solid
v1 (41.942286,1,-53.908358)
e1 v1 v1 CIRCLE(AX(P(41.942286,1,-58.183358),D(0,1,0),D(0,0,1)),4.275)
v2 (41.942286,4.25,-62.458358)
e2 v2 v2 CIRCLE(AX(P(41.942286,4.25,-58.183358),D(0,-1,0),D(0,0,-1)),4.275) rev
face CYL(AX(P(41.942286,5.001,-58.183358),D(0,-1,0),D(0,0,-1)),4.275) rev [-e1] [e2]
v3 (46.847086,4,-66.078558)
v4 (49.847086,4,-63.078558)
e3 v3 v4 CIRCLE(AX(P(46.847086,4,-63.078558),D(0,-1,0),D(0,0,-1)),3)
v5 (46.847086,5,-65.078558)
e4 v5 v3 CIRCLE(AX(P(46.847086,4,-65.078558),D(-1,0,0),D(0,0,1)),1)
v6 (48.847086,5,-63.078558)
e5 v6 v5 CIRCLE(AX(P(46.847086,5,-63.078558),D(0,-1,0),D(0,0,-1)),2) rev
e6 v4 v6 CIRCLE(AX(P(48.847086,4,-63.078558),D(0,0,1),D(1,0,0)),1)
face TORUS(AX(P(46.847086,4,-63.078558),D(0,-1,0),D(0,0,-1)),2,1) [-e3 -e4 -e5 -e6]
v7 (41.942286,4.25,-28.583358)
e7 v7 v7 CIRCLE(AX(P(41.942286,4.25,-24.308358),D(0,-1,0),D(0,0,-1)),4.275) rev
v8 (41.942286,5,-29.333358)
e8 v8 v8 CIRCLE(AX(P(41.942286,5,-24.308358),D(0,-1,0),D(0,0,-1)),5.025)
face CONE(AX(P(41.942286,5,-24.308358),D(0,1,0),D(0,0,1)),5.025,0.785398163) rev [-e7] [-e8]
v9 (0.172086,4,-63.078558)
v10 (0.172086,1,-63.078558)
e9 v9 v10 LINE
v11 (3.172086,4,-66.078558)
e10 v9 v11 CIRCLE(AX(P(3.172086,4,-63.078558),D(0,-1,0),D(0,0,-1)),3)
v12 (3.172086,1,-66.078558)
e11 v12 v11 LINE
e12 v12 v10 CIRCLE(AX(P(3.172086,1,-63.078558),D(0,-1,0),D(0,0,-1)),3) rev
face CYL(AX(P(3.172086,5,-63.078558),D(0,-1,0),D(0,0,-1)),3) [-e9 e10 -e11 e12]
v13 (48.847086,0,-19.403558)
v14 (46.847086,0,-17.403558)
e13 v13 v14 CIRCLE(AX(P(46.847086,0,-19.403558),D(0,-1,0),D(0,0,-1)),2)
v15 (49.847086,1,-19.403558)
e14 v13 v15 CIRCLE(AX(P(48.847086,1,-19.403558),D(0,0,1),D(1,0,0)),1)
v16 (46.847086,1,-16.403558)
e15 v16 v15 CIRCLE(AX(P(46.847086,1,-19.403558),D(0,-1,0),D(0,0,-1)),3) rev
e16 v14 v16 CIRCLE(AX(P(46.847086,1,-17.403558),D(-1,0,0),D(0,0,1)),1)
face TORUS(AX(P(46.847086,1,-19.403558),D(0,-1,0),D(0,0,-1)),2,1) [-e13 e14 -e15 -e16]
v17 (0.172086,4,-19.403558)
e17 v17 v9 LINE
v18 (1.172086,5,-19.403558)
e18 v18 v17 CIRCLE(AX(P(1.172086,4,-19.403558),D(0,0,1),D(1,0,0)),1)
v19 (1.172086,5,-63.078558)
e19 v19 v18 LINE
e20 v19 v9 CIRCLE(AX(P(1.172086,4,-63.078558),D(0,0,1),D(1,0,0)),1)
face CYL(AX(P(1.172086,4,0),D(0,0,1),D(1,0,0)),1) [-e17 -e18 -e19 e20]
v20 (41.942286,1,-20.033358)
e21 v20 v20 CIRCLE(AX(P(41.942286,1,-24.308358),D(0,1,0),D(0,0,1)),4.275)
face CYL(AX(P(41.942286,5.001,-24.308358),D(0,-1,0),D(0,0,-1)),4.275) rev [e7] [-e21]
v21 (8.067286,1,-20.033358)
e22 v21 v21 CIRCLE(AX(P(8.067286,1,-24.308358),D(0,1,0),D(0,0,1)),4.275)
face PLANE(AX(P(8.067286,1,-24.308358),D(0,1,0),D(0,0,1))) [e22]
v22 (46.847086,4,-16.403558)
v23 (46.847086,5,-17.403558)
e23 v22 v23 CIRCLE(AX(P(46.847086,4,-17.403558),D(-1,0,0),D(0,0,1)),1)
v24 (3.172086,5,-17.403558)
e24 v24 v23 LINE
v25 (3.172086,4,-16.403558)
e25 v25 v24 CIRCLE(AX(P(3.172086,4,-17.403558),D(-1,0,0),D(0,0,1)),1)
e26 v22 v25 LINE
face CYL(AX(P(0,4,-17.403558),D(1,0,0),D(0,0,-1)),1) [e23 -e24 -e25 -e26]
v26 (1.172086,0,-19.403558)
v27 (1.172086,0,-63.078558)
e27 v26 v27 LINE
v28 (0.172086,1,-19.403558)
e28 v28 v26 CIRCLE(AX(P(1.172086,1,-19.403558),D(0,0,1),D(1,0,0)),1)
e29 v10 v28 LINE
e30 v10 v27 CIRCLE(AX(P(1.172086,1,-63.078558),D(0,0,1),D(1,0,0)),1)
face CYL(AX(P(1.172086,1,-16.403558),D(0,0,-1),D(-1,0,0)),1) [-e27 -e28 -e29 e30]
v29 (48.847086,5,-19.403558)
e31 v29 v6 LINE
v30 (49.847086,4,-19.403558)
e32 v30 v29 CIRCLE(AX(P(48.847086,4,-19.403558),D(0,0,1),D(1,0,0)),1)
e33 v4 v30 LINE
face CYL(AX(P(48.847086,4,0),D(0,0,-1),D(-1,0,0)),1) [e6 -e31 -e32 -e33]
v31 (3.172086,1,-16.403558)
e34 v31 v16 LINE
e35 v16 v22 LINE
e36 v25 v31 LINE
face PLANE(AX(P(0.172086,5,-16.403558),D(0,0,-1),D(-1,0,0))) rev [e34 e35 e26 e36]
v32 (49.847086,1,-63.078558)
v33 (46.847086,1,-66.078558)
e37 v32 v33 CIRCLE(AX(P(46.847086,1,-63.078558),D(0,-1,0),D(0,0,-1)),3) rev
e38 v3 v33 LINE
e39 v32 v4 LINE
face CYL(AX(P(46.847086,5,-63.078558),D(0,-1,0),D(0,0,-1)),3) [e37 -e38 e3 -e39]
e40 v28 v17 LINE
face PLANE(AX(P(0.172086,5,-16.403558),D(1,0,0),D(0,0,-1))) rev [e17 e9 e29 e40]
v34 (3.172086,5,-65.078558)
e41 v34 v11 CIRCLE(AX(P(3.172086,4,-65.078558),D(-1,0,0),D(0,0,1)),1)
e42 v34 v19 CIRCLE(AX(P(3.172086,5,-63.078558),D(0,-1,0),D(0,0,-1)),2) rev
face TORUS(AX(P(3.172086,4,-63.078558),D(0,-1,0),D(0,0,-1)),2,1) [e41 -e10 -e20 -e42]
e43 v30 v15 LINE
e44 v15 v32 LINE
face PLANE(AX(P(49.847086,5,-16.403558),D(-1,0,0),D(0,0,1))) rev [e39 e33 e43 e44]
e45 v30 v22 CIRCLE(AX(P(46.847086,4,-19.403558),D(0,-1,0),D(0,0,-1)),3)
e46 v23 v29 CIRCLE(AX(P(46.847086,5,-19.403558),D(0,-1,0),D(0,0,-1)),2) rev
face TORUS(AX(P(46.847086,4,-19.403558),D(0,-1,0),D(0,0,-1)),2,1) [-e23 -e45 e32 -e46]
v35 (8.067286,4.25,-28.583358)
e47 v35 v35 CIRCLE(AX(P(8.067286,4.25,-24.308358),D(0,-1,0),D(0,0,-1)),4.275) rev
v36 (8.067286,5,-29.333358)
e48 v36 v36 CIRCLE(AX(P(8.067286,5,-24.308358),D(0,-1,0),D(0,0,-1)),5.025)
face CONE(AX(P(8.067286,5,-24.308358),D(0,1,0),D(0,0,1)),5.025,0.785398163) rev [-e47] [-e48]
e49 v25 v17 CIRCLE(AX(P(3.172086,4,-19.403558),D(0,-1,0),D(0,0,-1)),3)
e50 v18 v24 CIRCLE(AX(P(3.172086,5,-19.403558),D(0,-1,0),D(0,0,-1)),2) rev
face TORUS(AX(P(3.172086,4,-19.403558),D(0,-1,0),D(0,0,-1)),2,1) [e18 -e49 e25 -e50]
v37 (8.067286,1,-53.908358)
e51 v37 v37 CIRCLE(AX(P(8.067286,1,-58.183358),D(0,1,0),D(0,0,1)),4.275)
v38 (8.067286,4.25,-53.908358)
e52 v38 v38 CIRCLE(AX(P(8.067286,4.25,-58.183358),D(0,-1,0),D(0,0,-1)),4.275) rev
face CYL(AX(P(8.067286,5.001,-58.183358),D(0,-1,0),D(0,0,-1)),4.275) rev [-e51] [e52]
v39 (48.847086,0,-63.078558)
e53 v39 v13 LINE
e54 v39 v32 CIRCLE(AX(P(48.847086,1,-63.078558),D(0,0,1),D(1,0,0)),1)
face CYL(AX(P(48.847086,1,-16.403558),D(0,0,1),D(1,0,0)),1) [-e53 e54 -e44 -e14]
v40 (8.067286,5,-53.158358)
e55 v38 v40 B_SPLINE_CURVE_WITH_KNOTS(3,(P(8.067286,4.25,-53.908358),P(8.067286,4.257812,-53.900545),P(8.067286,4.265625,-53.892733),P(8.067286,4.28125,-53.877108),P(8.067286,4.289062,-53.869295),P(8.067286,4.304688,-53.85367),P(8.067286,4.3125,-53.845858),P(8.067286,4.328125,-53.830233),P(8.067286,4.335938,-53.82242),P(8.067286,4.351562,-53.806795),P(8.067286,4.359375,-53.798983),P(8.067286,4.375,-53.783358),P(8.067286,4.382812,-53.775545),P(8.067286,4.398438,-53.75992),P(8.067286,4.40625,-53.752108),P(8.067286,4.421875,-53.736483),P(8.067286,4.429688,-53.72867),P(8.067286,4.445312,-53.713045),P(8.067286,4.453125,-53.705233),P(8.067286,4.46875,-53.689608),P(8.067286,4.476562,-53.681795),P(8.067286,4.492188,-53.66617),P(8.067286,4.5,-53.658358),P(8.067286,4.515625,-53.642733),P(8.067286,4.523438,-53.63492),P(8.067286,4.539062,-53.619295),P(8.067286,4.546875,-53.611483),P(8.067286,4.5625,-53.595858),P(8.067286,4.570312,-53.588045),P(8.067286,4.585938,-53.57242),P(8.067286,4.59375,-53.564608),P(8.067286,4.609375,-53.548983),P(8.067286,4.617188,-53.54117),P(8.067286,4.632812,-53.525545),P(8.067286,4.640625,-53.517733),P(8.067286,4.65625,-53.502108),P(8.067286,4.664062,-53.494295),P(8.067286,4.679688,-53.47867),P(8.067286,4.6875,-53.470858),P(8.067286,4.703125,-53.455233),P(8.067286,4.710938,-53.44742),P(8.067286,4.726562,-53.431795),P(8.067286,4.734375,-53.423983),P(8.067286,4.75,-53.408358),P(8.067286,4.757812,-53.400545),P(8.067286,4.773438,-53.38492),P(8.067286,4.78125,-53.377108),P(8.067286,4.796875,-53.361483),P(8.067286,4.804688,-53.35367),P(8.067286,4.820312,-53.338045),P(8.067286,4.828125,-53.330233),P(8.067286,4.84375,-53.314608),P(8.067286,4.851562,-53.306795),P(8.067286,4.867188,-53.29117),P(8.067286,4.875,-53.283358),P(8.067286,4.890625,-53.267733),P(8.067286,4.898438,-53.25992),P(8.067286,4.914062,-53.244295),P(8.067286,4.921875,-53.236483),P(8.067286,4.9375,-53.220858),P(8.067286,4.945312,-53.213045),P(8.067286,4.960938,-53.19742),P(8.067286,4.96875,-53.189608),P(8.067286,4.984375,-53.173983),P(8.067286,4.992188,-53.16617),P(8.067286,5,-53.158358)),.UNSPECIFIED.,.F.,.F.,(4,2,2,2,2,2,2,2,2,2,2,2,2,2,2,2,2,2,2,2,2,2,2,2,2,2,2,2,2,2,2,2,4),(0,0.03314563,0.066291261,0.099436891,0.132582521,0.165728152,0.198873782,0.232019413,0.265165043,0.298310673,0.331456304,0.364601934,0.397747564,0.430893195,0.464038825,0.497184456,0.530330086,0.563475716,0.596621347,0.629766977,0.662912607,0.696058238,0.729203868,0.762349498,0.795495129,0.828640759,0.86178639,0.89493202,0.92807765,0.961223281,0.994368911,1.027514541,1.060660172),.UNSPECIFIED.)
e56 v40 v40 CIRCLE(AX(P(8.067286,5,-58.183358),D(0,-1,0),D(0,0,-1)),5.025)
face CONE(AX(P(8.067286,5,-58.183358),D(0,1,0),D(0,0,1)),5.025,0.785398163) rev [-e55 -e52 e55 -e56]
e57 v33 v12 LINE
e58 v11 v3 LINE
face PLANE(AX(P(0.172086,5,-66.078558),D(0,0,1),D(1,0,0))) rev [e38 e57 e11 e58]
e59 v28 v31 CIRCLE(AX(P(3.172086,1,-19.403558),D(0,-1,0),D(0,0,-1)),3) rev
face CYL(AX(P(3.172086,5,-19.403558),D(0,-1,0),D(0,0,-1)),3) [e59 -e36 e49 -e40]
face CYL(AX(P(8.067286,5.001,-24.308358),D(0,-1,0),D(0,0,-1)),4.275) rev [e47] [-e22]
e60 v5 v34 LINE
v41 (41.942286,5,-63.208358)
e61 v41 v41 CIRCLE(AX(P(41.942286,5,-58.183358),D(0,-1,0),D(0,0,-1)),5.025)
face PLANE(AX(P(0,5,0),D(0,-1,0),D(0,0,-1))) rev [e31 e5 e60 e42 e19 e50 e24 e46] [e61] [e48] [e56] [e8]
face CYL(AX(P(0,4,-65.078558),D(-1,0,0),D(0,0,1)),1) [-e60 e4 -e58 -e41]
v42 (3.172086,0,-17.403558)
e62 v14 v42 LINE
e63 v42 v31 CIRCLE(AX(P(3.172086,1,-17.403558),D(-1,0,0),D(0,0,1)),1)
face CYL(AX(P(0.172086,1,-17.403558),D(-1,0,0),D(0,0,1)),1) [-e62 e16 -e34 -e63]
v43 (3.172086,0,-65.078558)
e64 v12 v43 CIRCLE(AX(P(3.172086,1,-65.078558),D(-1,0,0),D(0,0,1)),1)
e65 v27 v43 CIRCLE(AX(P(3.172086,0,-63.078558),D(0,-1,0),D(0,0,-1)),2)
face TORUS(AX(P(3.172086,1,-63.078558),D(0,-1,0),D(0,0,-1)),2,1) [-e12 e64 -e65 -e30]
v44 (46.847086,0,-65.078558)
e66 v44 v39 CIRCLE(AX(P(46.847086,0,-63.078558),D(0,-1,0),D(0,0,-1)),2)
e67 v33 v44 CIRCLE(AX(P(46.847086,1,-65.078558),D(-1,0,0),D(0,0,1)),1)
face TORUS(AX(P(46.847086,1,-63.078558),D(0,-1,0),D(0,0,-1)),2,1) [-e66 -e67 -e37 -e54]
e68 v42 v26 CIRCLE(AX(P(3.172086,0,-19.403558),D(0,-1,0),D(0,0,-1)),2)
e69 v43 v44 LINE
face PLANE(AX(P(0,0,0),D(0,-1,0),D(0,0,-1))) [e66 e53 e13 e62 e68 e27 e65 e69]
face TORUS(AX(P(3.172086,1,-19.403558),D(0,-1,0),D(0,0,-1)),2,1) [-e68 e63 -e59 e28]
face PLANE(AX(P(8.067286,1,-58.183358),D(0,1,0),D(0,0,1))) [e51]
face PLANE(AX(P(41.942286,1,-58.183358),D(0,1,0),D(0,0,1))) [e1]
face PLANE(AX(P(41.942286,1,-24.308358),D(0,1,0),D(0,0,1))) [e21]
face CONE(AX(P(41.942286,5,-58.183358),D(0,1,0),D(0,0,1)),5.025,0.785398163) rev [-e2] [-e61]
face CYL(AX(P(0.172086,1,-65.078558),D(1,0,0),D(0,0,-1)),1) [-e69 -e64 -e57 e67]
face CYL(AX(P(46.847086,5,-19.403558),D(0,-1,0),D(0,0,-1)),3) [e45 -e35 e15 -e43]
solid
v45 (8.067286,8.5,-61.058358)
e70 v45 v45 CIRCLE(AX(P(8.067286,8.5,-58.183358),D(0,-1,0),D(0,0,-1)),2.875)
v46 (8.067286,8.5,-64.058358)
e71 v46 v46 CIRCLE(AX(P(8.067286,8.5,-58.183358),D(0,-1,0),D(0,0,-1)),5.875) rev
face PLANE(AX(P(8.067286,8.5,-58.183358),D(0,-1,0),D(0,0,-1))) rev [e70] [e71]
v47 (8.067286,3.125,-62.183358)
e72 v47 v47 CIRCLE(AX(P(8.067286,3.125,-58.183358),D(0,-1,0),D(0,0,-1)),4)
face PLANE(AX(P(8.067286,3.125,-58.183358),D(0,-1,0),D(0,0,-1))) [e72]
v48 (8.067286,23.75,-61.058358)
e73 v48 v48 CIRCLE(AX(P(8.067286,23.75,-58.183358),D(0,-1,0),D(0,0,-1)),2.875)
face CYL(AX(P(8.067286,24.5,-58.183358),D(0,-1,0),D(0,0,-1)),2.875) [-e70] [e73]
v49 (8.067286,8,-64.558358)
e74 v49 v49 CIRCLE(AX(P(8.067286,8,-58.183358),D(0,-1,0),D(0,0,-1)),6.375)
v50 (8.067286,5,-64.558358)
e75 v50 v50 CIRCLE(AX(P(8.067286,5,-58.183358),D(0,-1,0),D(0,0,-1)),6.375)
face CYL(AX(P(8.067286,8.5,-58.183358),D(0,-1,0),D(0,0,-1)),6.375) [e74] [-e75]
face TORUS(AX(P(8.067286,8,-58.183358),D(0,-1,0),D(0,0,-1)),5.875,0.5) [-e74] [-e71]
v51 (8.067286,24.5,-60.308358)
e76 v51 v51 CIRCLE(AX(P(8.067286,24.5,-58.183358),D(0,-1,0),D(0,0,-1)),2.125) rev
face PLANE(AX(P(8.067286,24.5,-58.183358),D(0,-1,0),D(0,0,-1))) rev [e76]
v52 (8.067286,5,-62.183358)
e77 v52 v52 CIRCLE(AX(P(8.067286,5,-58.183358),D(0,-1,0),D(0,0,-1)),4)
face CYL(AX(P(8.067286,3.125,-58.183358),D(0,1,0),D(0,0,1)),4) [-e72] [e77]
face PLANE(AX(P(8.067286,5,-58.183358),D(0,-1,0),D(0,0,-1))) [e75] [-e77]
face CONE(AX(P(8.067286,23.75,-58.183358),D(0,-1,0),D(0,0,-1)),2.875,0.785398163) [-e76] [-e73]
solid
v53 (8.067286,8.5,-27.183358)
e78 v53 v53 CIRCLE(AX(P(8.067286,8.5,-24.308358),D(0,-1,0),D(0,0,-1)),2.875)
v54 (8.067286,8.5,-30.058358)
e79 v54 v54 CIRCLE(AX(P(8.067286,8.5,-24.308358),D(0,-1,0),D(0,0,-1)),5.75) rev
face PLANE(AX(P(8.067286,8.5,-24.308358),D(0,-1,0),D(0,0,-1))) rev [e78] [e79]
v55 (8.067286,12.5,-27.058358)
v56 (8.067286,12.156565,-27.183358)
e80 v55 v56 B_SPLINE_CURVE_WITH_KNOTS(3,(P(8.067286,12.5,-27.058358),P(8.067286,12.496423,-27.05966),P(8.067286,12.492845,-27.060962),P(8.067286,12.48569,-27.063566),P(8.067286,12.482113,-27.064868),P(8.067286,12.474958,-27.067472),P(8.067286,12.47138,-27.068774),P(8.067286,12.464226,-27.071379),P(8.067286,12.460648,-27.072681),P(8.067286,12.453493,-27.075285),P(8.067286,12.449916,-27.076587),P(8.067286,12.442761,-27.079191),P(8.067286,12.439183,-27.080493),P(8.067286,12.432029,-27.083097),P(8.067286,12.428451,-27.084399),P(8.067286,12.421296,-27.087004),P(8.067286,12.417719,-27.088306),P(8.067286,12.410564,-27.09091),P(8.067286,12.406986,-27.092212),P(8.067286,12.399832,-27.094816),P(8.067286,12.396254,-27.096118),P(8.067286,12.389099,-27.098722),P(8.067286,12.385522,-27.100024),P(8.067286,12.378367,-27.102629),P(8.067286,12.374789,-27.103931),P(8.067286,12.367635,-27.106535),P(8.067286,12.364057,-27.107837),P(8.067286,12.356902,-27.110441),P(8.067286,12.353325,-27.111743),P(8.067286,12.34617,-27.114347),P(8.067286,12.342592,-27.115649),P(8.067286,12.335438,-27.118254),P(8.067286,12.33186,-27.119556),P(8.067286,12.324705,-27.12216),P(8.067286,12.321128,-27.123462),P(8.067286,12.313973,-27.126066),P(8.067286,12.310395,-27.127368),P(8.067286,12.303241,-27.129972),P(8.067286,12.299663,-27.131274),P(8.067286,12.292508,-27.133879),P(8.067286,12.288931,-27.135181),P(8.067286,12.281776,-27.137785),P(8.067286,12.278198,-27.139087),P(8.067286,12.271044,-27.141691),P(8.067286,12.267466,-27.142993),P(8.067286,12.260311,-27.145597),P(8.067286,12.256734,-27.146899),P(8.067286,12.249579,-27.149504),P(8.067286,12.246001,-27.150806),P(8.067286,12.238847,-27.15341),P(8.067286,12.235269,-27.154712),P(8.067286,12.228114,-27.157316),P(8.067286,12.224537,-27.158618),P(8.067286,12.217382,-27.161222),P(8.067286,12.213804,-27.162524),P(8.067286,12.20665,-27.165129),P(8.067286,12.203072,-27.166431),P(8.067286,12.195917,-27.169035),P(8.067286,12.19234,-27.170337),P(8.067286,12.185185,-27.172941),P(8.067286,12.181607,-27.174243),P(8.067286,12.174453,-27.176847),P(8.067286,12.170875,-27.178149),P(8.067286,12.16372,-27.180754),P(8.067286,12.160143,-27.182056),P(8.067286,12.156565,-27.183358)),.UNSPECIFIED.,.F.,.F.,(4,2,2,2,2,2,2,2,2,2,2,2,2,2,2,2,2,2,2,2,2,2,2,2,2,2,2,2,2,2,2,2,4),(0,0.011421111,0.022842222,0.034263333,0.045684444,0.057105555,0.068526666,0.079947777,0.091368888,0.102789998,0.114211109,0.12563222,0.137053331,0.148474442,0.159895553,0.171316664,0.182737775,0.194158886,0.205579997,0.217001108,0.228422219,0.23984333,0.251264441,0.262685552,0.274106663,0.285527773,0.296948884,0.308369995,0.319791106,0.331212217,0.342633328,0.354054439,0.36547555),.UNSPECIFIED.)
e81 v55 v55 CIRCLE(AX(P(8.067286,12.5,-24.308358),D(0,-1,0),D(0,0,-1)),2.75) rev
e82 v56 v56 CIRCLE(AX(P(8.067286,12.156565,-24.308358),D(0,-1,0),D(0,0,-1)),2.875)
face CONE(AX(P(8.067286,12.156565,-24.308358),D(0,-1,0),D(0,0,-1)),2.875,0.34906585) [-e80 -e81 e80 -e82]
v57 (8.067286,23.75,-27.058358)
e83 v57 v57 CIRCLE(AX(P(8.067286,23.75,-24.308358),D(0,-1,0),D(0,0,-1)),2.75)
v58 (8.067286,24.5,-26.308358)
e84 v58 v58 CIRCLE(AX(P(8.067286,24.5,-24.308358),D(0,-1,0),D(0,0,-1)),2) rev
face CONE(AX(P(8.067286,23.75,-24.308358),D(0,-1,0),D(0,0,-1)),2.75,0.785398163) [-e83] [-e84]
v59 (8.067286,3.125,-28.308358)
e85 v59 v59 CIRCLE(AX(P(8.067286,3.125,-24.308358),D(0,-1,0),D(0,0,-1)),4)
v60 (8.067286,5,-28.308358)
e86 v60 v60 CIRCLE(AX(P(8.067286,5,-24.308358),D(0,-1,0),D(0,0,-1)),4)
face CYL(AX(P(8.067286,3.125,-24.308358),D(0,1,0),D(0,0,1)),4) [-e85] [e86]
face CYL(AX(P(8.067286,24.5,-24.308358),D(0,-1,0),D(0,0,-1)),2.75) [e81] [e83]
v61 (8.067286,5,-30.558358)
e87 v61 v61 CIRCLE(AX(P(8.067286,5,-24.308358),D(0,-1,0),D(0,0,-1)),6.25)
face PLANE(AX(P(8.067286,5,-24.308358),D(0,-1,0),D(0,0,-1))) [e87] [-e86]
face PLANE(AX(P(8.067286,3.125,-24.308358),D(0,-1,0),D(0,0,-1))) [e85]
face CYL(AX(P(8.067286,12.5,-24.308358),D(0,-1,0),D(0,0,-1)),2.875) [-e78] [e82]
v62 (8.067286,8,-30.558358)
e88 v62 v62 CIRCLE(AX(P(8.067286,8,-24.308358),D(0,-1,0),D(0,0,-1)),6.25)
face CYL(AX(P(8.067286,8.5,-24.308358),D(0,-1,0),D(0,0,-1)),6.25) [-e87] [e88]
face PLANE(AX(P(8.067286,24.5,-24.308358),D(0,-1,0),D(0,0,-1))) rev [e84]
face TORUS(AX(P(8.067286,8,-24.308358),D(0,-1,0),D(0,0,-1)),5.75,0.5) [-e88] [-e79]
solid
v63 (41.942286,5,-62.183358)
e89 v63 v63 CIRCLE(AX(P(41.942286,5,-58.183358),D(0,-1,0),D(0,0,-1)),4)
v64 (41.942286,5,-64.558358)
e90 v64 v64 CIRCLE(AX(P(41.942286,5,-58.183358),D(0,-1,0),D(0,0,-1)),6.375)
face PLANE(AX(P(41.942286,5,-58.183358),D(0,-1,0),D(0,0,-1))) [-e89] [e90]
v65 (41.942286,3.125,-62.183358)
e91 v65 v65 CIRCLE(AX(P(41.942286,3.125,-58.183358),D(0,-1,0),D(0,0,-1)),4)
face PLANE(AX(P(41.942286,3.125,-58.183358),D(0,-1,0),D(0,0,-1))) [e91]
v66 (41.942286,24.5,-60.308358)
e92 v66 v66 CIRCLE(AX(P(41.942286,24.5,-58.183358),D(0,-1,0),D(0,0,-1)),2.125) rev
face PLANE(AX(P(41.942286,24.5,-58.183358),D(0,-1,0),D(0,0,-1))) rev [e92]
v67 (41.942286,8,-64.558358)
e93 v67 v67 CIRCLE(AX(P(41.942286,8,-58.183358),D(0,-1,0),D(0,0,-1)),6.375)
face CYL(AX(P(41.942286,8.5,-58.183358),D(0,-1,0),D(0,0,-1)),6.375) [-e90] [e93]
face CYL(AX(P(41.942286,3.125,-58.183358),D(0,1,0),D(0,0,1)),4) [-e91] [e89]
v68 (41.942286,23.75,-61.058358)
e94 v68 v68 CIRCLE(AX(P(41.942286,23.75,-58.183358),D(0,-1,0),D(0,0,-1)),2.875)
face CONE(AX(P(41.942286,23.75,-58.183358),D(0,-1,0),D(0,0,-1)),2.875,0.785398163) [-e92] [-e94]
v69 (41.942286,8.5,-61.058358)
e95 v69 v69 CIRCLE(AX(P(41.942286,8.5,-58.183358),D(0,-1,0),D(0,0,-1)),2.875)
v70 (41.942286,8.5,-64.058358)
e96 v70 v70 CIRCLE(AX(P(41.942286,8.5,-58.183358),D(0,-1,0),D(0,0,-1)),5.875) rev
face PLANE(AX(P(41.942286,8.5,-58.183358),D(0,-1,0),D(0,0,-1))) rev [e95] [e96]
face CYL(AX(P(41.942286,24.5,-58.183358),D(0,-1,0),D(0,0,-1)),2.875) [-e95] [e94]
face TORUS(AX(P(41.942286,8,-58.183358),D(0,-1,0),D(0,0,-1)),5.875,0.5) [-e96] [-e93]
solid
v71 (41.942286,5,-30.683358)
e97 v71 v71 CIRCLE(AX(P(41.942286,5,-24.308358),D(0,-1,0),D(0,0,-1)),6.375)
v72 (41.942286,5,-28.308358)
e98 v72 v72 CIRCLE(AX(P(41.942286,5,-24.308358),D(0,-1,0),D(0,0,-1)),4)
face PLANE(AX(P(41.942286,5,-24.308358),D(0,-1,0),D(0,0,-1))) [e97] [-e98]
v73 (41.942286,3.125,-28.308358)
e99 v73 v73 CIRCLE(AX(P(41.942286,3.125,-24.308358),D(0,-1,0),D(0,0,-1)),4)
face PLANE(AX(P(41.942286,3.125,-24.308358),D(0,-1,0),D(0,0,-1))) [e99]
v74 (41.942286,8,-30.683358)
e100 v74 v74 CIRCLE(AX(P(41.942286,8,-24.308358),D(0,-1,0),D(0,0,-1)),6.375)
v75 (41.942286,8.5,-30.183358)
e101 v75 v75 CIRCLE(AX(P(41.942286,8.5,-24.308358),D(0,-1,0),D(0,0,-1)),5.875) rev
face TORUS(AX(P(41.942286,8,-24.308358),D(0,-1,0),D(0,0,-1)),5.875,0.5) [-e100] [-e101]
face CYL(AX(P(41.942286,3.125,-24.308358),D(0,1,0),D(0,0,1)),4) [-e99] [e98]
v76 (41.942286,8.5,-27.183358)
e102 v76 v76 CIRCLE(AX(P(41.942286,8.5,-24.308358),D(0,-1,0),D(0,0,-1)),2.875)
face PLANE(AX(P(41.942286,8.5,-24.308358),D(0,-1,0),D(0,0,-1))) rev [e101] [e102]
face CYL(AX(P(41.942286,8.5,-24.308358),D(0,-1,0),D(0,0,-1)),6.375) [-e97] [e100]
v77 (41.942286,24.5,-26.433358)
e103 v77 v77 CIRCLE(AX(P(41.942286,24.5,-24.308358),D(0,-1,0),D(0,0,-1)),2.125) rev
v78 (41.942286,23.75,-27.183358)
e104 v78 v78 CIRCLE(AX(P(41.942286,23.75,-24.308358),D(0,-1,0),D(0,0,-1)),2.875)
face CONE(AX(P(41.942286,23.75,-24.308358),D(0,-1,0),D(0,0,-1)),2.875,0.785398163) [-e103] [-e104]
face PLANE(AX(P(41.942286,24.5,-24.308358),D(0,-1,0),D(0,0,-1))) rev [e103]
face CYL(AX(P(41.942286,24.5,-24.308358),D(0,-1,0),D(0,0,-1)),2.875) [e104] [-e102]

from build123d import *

# Parameters (mm, degrees)
SKETCH1_W             = 49.675
SKETCH1_H             = 49.675
BOSS_EXTRUDE1_DEPTH   = 5
CUT_EXTRUDE1_REACH    = 85.922
CUT_EXTRUDE1_START    = 1
SKETCH3_R             = 4.275
BOSS_EXTRUDE2_START   = 5
SKETCH2_R             = 6.375
BOSS_EXTRUDE2_DEPTH   = 3.5
BOSS_EXTRUDE2_2_DEPTH = 3.5
SKETCH2_R_2           = 6.25
BOSS_EXTRUDE2_3_DEPTH = 3.5
BOSS_EXTRUDE2_4_DEPTH = 3.5
BOSS_EXTRUDE3_START   = 8.5
SKETCH2_3_R           = 2.875
SKETCH2_3_R_2         = 2.75
BOSS_EXTRUDE3_DEPTH   = 16
BOSS_EXTRUDE4_START   = 5
SKETCH3_2_R           = 4
BOSS_EXTRUDE4_DEPTH   = 1.875
BOSS_EXTRUDE5_START   = 8.5
SKETCH2_4_R           = 2.875
BOSS_EXTRUDE5_DEPTH   = 4
CHAMFER6_SIZE2        = 0.125
CHAMFER6_SIZE         = 0.343434677
CHAMFER1_SIZE         = 0.75
FILLET5_R             = 3
FILLET6_R             = 1
FILLET1_R             = 0.5
FILLET2_R             = 0.5
FILLET3_R             = 0.5
FILLET4_R             = 0.5
CHAMFER2_SIZE         = 0.75
CHAMFER3_SIZE         = 0.75
CHAMFER4_SIZE         = 0.75
CHAMFER5_SIZE         = 0.75


with BuildPart() as part:
    # Sketch1 → Boss-Extrude1 (new body)
    with BuildSketch(Plane(origin=(0, 0, 0), x_dir=(1, 0, 0), z_dir=(0, 1, 0))):
        with Locations((25.009585601, 41.241057723)):
            Rectangle(SKETCH1_W, SKETCH1_H)
    extrude(amount=BOSS_EXTRUDE1_DEPTH)

    # Sketch3 → Cut-Extrude1 (cut, up to next)
    with BuildSketch(Plane(origin=(0, 0, 0), x_dir=(1, 0, 0), z_dir=(0, 1, 0)).offset(CUT_EXTRUDE1_START), mode=Mode.PRIVATE) as cut_extrude1_sk1:
        with Locations(Location((8.067285601, 24.308357723, 0), (0, 0, 90))):
            Circle(SKETCH3_R)
    cut_extrude1_tool1 = extrude(cut_extrude1_sk1.sketch, amount=CUT_EXTRUDE1_REACH, mode=Mode.PRIVATE) & part.part
    # Sketch3 → Cut-Extrude1 (cut, up to next)
    with BuildSketch(Plane(origin=(0, 0, 0), x_dir=(1, 0, 0), z_dir=(0, 1, 0)).offset(CUT_EXTRUDE1_START), mode=Mode.PRIVATE) as cut_extrude1_sk2:
        with Locations(Location((41.942285601, 24.308357723, 0), (0, 0, 90))):
            Circle(SKETCH3_R)
    cut_extrude1_tool2 = extrude(cut_extrude1_sk2.sketch, amount=CUT_EXTRUDE1_REACH, mode=Mode.PRIVATE) & part.part
    # Sketch3 → Cut-Extrude1 (cut, up to next)
    with BuildSketch(Plane(origin=(0, 0, 0), x_dir=(1, 0, 0), z_dir=(0, 1, 0)).offset(CUT_EXTRUDE1_START), mode=Mode.PRIVATE) as cut_extrude1_sk3:
        with Locations(Location((41.942285601, 58.183357723, 0), (0, 0, 90))):
            Circle(SKETCH3_R)
    cut_extrude1_tool3 = extrude(cut_extrude1_sk3.sketch, amount=CUT_EXTRUDE1_REACH, mode=Mode.PRIVATE) & part.part
    # Sketch3 → Cut-Extrude1 (cut, up to next)
    with BuildSketch(Plane(origin=(0, 0, 0), x_dir=(1, 0, 0), z_dir=(0, 1, 0)).offset(CUT_EXTRUDE1_START), mode=Mode.PRIVATE) as cut_extrude1_sk4:
        with Locations(Location((8.067285601, 58.183357723, 0), (0, 0, 90))):
            Circle(SKETCH3_R)
    cut_extrude1_tool4 = extrude(cut_extrude1_sk4.sketch, amount=CUT_EXTRUDE1_REACH, mode=Mode.PRIVATE) & part.part
    add(cut_extrude1_tool1.solids().sort_by_distance((8.067286, 1, -24.308358))[0], mode=Mode.SUBTRACT)
    add(cut_extrude1_tool2.solids().sort_by_distance((41.942286, 1, -24.308358))[0], mode=Mode.SUBTRACT)
    add(cut_extrude1_tool3.solids().sort_by_distance((41.942286, 1, -58.183358))[0], mode=Mode.SUBTRACT)
    add(cut_extrude1_tool4.solids().sort_by_distance((8.067286, 1, -58.183358))[0], mode=Mode.SUBTRACT)

    # Chamfer1
    chamfer1_edges = [part.edges().sort_by_distance(p)[0] for p in [
        (41.942285601, 5, -53.908357723),
        (8.067285601, 5, -20.033357723),
        (8.067285601, 5, -53.908357723),
        (41.942285601, 5, -20.033357723),
    ]]
    chamfer(chamfer1_edges, length=CHAMFER1_SIZE)

    # Fillet5
    fillet5_edges = [part.edges().sort_by_distance(p)[0] for p in [
        (0.172085601, 2.5, -66.078557723),
        (49.847085601, 2.5, -66.078557723),
        (49.847085601, 2.5, -16.403557723),
        (0.172085601, 2.5, -16.403557723),
    ]]
    fillet(fillet5_edges, radius=FILLET5_R)

    # Fillet6
    fillet6_edges = [part.edges().sort_by_distance(p)[0] for p in [
        (49.847085601, 0, -41.241057723),
        (49.847085601, 5, -41.241057723),
        (0.172085601, 0, -41.241057723),
        (25.009585601, 0, -66.078557723),
        (25.009585601, 0, -16.403557723),
        (1.050765257, 0, -17.282237379),
        (1.050765257, 0, -65.199878066),
        (48.968405944, 0, -65.199878066),
        (48.968405944, 0, -17.282237379),
        (25.009585601, 5, -16.403557723),
        (0.172085601, 5, -41.241057723),
        (25.009585601, 5, -66.078557723),
        (1.050765257, 5, -17.282237379),
        (1.050765257, 5, -65.199878066),
        (48.968405944, 5, -65.199878066),
        (48.968405944, 5, -17.282237379),
    ]]
    fillet(fillet6_edges, radius=FILLET6_R)


with BuildPart() as body_2:
    # Sketch2 → Boss-Extrude2 (new body)
    with BuildSketch(Plane(origin=(0, 0, 0), x_dir=(1, 0, 0), z_dir=(0, 1, 0)).offset(BOSS_EXTRUDE2_START)):
        with Locations(Location((41.942285601, 58.183357723, 0), (0, 0, 90))):
            Circle(SKETCH2_R)
    extrude(amount=BOSS_EXTRUDE2_DEPTH)



with BuildPart() as body_3:
    # Sketch2 → Boss-Extrude2 2 (new body)
    with BuildSketch(Plane(origin=(0, 0, 0), x_dir=(1, 0, 0), z_dir=(0, 1, 0)).offset(BOSS_EXTRUDE2_START)):
        with Locations(Location((41.942285601, 24.308357723, 0), (0, 0, 90))):
            Circle(SKETCH2_R)
    extrude(amount=BOSS_EXTRUDE2_2_DEPTH)


with BuildPart() as body_4:
    # Sketch2 → Boss-Extrude2 3 (new body)
    with BuildSketch(Plane(origin=(0, 0, 0), x_dir=(1, 0, 0), z_dir=(0, 1, 0)).offset(BOSS_EXTRUDE2_START)):
        with Locations(Location((8.067285601, 24.308357723, 0), (0, 0, 90))):
            Circle(SKETCH2_R_2)
    extrude(amount=BOSS_EXTRUDE2_3_DEPTH)


with BuildPart() as body_5:
    # Sketch2 → Boss-Extrude2 4 (new body)
    with BuildSketch(Plane(origin=(0, 0, 0), x_dir=(1, 0, 0), z_dir=(0, 1, 0)).offset(BOSS_EXTRUDE2_START)):
        with Locations(Location((8.067285601, 58.183357723, 0), (0, 0, 90))):
            Circle(SKETCH2_R)
    extrude(amount=BOSS_EXTRUDE2_4_DEPTH)


with BuildPart() as body_2_1:
    add(body_2.part)

    add(body_3.part)  # Boss-Extrude3 merges body 3

    add(body_4.part)  # Boss-Extrude3 merges body 4

    add(body_5.part)  # Boss-Extrude3 merges body 5
    # Sketch2<3> → Boss-Extrude3 (add)
    with BuildSketch(Plane(origin=(0, 0, 0), x_dir=(1, 0, 0), z_dir=(0, 1, 0)).offset(BOSS_EXTRUDE3_START)):
        with Locations(Location((8.067285601, 58.183357723, 0), (0, 0, 90))):
            Circle(SKETCH2_3_R)
        with Locations(Location((41.942285601, 58.183357723, 0), (0, 0, 90))):
            Circle(SKETCH2_3_R)
        with Locations(Location((41.942285601, 24.308357723, 0), (0, 0, 90))):
            Circle(SKETCH2_3_R)
        with Locations(Location((8.067285601, 24.308357723, 0), (0, 0, 90))):
            Circle(SKETCH2_3_R_2)
    extrude(amount=BOSS_EXTRUDE3_DEPTH)

    # Sketch3<2> → Boss-Extrude4 (add)
    with BuildSketch(Plane(origin=(0, 0, 0), x_dir=(1, 0, 0), z_dir=(0, 1, 0)).offset(BOSS_EXTRUDE4_START)):
        with Locations(Location((8.067285601, 58.183357723, 0), (0, 0, 90))):
            Circle(SKETCH3_2_R)
        with Locations(Location((41.942285601, 58.183357723, 0), (0, 0, 90))):
            Circle(SKETCH3_2_R)
        with Locations(Location((41.942285601, 24.308357723, 0), (0, 0, 90))):
            Circle(SKETCH3_2_R)
        with Locations(Location((8.067285601, 24.308357723, 0), (0, 0, 90))):
            Circle(SKETCH3_2_R)
    extrude(amount=-BOSS_EXTRUDE4_DEPTH)

    # Sketch2<4> → Boss-Extrude5 (add)
    with BuildSketch(Plane(origin=(0, 0, 0), x_dir=(1, 0, 0), z_dir=(0, 1, 0)).offset(BOSS_EXTRUDE5_START)):
        with Locations(Location((8.067285601, 24.308357723, 0), (0, 0, 90))):
            Circle(SKETCH2_4_R)
    extrude(amount=BOSS_EXTRUDE5_DEPTH)

    # Chamfer6
    chamfer6_edges = [body_2_1.edges().sort_by_distance(p)[0] for p in [
        (8.067285601, 12.5, -21.433357723),
    ]]
    chamfer6_side = [body_2_1.faces().sort_by_distance(p)[0] for p in [
        (8.067285601, 12.4975, -21.433357723),
    ]]
    chamfer(chamfer6_edges, length=CHAMFER6_SIZE - 0.0001, length2=CHAMFER6_SIZE2 - 0.0001, reference=chamfer6_side[0])  # a hair under: the kernel refuses the full size

    # Fillet1
    fillet1_edges = [body_2_1.edges().sort_by_distance(p)[0] for p in [
        (8.067285601, 8.5, -18.058357723),
    ]]
    fillet(fillet1_edges, radius=FILLET1_R)

    # Fillet2
    fillet2_edges = [body_2_1.edges().sort_by_distance(p)[0] for p in [
        (41.942285601, 8.5, -17.933357723),
    ]]
    fillet(fillet2_edges, radius=FILLET2_R)

    # Fillet3
    fillet3_edges = [body_2_1.edges().sort_by_distance(p)[0] for p in [
        (8.067285601, 8.5, -51.808357723),
    ]]
    fillet(fillet3_edges, radius=FILLET3_R)

    # Fillet4
    fillet4_edges = [body_2_1.edges().sort_by_distance(p)[0] for p in [
        (41.942285601, 8.5, -51.808357723),
    ]]
    fillet(fillet4_edges, radius=FILLET4_R)

    # Chamfer2
    chamfer2_edges = [body_2_1.edges().sort_by_distance(p)[0] for p in [
        (8.067285601, 24.5, -21.558357723),
    ]]
    chamfer(chamfer2_edges, length=CHAMFER2_SIZE)

    # Chamfer3
    chamfer3_edges = [body_2_1.edges().sort_by_distance(p)[0] for p in [
        (8.067285601, 24.5, -55.308357723),
    ]]
    chamfer(chamfer3_edges, length=CHAMFER3_SIZE)

    # Chamfer4
    chamfer4_edges = [body_2_1.edges().sort_by_distance(p)[0] for p in [
        (41.942285601, 24.5, -55.308357723),
    ]]
    chamfer(chamfer4_edges, length=CHAMFER4_SIZE)

    # Chamfer5
    chamfer5_edges = [body_2_1.edges().sort_by_distance(p)[0] for p in [
        (41.942285601, 24.5, -21.433357723),
    ]]
    chamfer(chamfer5_edges, length=CHAMFER5_SIZE)


solid = Compound([part.part, body_2_1.part])
